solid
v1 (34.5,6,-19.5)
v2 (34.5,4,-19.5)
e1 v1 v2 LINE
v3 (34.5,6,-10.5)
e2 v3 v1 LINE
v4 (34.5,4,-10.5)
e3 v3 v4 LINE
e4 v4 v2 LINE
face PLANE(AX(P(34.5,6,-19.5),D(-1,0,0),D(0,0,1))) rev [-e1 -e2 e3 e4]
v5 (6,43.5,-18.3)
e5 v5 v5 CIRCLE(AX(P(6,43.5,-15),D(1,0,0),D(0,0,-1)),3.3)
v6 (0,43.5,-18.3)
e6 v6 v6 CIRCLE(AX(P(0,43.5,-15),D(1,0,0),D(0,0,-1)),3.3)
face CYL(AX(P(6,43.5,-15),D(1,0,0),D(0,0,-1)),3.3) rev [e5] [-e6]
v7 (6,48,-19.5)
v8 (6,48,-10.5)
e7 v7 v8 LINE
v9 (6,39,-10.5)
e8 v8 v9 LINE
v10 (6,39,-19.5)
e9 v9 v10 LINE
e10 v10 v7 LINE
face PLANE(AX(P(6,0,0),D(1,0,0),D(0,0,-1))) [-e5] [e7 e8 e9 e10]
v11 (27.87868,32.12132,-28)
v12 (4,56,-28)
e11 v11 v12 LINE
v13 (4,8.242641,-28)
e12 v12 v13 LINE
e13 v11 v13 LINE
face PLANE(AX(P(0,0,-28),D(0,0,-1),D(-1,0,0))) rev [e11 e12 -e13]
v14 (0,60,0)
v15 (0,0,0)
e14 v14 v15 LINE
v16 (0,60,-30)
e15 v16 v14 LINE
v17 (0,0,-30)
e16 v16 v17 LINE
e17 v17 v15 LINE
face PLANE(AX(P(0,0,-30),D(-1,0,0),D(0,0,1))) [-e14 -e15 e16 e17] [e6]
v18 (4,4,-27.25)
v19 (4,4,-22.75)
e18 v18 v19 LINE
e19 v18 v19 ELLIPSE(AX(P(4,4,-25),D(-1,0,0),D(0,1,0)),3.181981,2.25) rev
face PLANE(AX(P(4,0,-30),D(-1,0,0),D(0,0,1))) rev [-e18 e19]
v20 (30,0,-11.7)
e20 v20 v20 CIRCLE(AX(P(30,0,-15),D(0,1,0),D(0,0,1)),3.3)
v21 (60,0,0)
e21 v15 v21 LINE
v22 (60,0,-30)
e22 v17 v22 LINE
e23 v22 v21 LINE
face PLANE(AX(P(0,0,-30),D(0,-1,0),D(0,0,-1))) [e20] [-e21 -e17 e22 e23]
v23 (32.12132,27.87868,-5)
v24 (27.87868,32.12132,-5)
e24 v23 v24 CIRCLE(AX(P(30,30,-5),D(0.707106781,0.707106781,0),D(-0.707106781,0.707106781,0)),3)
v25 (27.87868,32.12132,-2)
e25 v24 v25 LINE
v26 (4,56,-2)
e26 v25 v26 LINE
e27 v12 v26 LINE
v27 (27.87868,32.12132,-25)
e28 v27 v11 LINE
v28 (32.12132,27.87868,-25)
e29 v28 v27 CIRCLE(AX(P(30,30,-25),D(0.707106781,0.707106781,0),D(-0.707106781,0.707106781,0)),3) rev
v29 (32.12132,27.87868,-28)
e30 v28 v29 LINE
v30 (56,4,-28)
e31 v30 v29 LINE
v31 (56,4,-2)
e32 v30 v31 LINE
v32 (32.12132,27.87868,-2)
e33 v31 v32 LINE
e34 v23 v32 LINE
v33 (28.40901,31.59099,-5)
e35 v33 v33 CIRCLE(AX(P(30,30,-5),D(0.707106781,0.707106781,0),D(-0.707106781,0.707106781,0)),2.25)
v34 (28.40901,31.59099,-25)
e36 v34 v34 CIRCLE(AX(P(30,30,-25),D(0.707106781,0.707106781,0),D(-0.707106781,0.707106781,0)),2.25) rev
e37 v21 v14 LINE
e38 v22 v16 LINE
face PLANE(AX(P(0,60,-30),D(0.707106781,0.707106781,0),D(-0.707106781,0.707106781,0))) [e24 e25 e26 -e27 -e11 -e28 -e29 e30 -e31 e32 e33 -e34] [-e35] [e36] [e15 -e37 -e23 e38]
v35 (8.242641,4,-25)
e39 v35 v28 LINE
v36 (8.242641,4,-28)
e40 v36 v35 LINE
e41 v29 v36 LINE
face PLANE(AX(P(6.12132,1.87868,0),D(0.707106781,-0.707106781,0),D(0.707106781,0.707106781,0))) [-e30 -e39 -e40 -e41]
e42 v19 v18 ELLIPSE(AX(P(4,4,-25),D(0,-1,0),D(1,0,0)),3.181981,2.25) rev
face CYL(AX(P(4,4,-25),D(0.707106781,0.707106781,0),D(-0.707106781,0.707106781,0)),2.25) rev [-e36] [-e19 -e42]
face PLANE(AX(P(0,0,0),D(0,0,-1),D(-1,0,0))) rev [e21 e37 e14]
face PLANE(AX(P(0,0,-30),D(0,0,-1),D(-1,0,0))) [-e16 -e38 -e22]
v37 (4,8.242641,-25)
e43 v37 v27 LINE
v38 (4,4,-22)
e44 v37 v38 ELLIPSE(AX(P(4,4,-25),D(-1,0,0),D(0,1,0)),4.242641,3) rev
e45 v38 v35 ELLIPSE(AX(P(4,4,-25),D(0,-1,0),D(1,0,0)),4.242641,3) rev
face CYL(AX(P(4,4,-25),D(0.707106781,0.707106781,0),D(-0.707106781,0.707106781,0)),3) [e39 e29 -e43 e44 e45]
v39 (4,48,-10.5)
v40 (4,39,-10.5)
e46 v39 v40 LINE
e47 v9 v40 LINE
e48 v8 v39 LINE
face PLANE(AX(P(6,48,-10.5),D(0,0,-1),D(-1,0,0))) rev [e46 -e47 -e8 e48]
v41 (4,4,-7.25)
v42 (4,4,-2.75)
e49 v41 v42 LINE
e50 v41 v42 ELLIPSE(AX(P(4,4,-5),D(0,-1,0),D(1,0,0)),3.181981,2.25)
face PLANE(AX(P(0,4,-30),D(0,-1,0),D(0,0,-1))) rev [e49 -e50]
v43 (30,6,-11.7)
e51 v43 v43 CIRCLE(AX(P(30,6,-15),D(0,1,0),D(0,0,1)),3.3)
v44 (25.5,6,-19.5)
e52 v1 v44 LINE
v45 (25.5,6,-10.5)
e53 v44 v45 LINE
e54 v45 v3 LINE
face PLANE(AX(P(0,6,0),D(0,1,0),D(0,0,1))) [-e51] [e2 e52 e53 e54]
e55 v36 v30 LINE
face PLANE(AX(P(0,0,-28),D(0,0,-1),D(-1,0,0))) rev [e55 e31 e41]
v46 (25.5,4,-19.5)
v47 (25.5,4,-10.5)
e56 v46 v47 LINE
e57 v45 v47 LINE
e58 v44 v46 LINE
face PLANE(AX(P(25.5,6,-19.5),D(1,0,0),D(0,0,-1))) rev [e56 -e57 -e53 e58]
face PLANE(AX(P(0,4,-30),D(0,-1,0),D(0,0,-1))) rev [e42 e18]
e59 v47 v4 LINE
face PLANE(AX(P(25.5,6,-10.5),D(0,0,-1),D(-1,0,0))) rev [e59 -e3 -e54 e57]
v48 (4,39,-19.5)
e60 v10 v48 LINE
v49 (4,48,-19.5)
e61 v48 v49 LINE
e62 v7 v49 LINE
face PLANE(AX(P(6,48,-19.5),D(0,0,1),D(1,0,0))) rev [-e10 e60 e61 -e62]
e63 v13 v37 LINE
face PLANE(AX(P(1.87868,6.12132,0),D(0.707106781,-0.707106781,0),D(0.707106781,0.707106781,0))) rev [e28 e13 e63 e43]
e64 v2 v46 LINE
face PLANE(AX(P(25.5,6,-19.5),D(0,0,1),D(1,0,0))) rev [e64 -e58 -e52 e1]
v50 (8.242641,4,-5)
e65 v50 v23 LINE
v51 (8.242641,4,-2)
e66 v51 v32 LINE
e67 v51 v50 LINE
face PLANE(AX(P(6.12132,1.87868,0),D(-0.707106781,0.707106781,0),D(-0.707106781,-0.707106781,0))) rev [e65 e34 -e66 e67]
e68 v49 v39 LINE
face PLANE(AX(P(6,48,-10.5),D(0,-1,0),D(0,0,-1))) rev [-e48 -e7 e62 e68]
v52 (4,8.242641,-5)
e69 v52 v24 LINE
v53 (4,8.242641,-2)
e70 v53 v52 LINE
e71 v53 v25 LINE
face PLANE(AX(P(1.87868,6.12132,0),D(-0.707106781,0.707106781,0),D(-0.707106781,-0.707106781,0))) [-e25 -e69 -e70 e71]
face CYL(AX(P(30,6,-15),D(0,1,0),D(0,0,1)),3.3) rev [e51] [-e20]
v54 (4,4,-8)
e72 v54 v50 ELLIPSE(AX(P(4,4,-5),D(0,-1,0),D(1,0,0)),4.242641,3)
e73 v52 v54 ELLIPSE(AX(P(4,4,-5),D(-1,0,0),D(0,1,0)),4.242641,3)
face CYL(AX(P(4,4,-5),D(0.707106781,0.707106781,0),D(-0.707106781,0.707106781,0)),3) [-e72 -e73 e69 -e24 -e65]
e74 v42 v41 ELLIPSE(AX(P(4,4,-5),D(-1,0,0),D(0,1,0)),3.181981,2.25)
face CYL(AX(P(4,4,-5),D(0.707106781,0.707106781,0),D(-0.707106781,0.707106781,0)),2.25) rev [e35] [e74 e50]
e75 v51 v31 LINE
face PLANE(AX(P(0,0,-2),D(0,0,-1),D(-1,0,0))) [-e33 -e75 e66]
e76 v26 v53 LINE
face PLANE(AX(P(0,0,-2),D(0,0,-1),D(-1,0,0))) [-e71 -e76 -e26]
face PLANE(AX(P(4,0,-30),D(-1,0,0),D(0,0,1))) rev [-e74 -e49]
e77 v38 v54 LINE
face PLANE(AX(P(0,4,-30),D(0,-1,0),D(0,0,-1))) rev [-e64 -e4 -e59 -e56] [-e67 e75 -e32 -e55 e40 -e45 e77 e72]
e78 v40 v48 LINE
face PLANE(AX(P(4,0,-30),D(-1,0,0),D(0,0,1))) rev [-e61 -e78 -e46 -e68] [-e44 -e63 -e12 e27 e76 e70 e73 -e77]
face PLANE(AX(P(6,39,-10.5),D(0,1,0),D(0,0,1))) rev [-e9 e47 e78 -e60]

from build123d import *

# Parameters (mm, degrees)
BOSS_EXTRUDE1_DEPTH  = 30
SHELL1_START         = 4
SHELL1_OUTLINE_W     = 57
SHELL1_OUTLINE_H     = 26
SHELL1_DEPTH         = 52
SKETCH2_W            = 9
SKETCH2_H            = 9
BOSS_EXTRUDE2_DEPTH  = 2
SKETCH3_W            = 9
SKETCH3_H            = 9
BOSS_EXTRUDE3_DEPTH  = 2
BOSS_EXTRUDE4_START  = -36.769553
SKETCH4_R            = 2.25
BOSS_EXTRUDE4_DEPTH  = 36.769553
M6_CLEARANCE_HOLE2_D = 6.6
M6_CLEARANCE_HOLE3_D = 6.6


# Read off the part's stored shape, not the designer's step: Shell1
with BuildPart() as part:
    # Sketch1 → Boss-Extrude1 (new body)
    with BuildSketch(Plane.XY):
        Polygon((0, 0), (60, 0), (0, 60), align=None)
    extrude(amount=-BOSS_EXTRUDE1_DEPTH)

    # Shell1 outline → Shell1 (cut)
    with BuildSketch(Plane.YZ.offset(SHELL1_START)):
        with Locations((32.5, -15)):
            Rectangle(SHELL1_OUTLINE_W, SHELL1_OUTLINE_H)
    extrude(amount=SHELL1_DEPTH, mode=Mode.SUBTRACT)

    # Sketch2 → Boss-Extrude2 (add)
    with BuildSketch(Plane(origin=(0, 4, 0), x_dir=(1, 0, 0), z_dir=(0, 1, 0))):
        with Locations((30, 15)):
            Rectangle(SKETCH2_W, SKETCH2_H)
    extrude(amount=BOSS_EXTRUDE2_DEPTH)

    # Sketch3 → Boss-Extrude3 (add)
    with BuildSketch(Plane(origin=(4, 0, 0), x_dir=(0, 0, -1), z_dir=(1, 0, 0))):
        with Locations((15, 43.5)):
            Rectangle(SKETCH3_W, SKETCH3_H)
    extrude(amount=BOSS_EXTRUDE3_DEPTH)

    # Sketch4 → Boss-Extrude4 (add)
    # profile 1 of 2: a face of its own
    with BuildSketch(Plane(origin=(30, 30, 0), x_dir=(0, 0, -1), z_dir=(0.7071067811865477, 0.7071067811865475, 0)).offset(BOSS_EXTRUDE4_START)):
        with BuildLine():
            Line((2, 3), (2, -3))
            Line((2, -3), (5, -3))
            ThreePointArc((5, -3), (8, 0), (5, 3))
            Line((5, 3), (2, 3))
        make_face()
        with Locations(Location((5, 0, 0), (0, 0, 90))):
            Circle(SKETCH4_R, mode=Mode.SUBTRACT)
    # profile 2 of 2: a face of its own
    with BuildSketch(Plane(origin=(30, 30, 0), x_dir=(0, 0, -1), z_dir=(0.7071067811865477, 0.7071067811865475, 0)).offset(BOSS_EXTRUDE4_START)):
        with BuildLine():
            Line((25, -3), (28, -3))
            Line((28, -3), (28, 3))
            Line((28, 3), (25, 3))
            ThreePointArc((25, 3), (22, 0), (25, -3))
        make_face()
        with Locations(Location((25, 0, 0), (0, 0, 90))):
            Circle(SKETCH4_R, mode=Mode.SUBTRACT)
    extrude(amount=BOSS_EXTRUDE4_DEPTH)

    # M6 Clearance Hole2 (through all)
    with Locations(Plane(origin=(0, 6, 0), x_dir=(1, 0, 0), z_dir=(0, 1, 0))):
        with Locations((30, 15)):
            Hole(M6_CLEARANCE_HOLE2_D / 2)

    # M6 Clearance Hole3 (through all)
    with Locations(Plane(origin=(6, 0, 0), x_dir=(0, 0, -1), z_dir=(1, 0, 0))):
        with Locations((15, 43.5)):
            Hole(M6_CLEARANCE_HOLE3_D / 2)


solid = part.part
